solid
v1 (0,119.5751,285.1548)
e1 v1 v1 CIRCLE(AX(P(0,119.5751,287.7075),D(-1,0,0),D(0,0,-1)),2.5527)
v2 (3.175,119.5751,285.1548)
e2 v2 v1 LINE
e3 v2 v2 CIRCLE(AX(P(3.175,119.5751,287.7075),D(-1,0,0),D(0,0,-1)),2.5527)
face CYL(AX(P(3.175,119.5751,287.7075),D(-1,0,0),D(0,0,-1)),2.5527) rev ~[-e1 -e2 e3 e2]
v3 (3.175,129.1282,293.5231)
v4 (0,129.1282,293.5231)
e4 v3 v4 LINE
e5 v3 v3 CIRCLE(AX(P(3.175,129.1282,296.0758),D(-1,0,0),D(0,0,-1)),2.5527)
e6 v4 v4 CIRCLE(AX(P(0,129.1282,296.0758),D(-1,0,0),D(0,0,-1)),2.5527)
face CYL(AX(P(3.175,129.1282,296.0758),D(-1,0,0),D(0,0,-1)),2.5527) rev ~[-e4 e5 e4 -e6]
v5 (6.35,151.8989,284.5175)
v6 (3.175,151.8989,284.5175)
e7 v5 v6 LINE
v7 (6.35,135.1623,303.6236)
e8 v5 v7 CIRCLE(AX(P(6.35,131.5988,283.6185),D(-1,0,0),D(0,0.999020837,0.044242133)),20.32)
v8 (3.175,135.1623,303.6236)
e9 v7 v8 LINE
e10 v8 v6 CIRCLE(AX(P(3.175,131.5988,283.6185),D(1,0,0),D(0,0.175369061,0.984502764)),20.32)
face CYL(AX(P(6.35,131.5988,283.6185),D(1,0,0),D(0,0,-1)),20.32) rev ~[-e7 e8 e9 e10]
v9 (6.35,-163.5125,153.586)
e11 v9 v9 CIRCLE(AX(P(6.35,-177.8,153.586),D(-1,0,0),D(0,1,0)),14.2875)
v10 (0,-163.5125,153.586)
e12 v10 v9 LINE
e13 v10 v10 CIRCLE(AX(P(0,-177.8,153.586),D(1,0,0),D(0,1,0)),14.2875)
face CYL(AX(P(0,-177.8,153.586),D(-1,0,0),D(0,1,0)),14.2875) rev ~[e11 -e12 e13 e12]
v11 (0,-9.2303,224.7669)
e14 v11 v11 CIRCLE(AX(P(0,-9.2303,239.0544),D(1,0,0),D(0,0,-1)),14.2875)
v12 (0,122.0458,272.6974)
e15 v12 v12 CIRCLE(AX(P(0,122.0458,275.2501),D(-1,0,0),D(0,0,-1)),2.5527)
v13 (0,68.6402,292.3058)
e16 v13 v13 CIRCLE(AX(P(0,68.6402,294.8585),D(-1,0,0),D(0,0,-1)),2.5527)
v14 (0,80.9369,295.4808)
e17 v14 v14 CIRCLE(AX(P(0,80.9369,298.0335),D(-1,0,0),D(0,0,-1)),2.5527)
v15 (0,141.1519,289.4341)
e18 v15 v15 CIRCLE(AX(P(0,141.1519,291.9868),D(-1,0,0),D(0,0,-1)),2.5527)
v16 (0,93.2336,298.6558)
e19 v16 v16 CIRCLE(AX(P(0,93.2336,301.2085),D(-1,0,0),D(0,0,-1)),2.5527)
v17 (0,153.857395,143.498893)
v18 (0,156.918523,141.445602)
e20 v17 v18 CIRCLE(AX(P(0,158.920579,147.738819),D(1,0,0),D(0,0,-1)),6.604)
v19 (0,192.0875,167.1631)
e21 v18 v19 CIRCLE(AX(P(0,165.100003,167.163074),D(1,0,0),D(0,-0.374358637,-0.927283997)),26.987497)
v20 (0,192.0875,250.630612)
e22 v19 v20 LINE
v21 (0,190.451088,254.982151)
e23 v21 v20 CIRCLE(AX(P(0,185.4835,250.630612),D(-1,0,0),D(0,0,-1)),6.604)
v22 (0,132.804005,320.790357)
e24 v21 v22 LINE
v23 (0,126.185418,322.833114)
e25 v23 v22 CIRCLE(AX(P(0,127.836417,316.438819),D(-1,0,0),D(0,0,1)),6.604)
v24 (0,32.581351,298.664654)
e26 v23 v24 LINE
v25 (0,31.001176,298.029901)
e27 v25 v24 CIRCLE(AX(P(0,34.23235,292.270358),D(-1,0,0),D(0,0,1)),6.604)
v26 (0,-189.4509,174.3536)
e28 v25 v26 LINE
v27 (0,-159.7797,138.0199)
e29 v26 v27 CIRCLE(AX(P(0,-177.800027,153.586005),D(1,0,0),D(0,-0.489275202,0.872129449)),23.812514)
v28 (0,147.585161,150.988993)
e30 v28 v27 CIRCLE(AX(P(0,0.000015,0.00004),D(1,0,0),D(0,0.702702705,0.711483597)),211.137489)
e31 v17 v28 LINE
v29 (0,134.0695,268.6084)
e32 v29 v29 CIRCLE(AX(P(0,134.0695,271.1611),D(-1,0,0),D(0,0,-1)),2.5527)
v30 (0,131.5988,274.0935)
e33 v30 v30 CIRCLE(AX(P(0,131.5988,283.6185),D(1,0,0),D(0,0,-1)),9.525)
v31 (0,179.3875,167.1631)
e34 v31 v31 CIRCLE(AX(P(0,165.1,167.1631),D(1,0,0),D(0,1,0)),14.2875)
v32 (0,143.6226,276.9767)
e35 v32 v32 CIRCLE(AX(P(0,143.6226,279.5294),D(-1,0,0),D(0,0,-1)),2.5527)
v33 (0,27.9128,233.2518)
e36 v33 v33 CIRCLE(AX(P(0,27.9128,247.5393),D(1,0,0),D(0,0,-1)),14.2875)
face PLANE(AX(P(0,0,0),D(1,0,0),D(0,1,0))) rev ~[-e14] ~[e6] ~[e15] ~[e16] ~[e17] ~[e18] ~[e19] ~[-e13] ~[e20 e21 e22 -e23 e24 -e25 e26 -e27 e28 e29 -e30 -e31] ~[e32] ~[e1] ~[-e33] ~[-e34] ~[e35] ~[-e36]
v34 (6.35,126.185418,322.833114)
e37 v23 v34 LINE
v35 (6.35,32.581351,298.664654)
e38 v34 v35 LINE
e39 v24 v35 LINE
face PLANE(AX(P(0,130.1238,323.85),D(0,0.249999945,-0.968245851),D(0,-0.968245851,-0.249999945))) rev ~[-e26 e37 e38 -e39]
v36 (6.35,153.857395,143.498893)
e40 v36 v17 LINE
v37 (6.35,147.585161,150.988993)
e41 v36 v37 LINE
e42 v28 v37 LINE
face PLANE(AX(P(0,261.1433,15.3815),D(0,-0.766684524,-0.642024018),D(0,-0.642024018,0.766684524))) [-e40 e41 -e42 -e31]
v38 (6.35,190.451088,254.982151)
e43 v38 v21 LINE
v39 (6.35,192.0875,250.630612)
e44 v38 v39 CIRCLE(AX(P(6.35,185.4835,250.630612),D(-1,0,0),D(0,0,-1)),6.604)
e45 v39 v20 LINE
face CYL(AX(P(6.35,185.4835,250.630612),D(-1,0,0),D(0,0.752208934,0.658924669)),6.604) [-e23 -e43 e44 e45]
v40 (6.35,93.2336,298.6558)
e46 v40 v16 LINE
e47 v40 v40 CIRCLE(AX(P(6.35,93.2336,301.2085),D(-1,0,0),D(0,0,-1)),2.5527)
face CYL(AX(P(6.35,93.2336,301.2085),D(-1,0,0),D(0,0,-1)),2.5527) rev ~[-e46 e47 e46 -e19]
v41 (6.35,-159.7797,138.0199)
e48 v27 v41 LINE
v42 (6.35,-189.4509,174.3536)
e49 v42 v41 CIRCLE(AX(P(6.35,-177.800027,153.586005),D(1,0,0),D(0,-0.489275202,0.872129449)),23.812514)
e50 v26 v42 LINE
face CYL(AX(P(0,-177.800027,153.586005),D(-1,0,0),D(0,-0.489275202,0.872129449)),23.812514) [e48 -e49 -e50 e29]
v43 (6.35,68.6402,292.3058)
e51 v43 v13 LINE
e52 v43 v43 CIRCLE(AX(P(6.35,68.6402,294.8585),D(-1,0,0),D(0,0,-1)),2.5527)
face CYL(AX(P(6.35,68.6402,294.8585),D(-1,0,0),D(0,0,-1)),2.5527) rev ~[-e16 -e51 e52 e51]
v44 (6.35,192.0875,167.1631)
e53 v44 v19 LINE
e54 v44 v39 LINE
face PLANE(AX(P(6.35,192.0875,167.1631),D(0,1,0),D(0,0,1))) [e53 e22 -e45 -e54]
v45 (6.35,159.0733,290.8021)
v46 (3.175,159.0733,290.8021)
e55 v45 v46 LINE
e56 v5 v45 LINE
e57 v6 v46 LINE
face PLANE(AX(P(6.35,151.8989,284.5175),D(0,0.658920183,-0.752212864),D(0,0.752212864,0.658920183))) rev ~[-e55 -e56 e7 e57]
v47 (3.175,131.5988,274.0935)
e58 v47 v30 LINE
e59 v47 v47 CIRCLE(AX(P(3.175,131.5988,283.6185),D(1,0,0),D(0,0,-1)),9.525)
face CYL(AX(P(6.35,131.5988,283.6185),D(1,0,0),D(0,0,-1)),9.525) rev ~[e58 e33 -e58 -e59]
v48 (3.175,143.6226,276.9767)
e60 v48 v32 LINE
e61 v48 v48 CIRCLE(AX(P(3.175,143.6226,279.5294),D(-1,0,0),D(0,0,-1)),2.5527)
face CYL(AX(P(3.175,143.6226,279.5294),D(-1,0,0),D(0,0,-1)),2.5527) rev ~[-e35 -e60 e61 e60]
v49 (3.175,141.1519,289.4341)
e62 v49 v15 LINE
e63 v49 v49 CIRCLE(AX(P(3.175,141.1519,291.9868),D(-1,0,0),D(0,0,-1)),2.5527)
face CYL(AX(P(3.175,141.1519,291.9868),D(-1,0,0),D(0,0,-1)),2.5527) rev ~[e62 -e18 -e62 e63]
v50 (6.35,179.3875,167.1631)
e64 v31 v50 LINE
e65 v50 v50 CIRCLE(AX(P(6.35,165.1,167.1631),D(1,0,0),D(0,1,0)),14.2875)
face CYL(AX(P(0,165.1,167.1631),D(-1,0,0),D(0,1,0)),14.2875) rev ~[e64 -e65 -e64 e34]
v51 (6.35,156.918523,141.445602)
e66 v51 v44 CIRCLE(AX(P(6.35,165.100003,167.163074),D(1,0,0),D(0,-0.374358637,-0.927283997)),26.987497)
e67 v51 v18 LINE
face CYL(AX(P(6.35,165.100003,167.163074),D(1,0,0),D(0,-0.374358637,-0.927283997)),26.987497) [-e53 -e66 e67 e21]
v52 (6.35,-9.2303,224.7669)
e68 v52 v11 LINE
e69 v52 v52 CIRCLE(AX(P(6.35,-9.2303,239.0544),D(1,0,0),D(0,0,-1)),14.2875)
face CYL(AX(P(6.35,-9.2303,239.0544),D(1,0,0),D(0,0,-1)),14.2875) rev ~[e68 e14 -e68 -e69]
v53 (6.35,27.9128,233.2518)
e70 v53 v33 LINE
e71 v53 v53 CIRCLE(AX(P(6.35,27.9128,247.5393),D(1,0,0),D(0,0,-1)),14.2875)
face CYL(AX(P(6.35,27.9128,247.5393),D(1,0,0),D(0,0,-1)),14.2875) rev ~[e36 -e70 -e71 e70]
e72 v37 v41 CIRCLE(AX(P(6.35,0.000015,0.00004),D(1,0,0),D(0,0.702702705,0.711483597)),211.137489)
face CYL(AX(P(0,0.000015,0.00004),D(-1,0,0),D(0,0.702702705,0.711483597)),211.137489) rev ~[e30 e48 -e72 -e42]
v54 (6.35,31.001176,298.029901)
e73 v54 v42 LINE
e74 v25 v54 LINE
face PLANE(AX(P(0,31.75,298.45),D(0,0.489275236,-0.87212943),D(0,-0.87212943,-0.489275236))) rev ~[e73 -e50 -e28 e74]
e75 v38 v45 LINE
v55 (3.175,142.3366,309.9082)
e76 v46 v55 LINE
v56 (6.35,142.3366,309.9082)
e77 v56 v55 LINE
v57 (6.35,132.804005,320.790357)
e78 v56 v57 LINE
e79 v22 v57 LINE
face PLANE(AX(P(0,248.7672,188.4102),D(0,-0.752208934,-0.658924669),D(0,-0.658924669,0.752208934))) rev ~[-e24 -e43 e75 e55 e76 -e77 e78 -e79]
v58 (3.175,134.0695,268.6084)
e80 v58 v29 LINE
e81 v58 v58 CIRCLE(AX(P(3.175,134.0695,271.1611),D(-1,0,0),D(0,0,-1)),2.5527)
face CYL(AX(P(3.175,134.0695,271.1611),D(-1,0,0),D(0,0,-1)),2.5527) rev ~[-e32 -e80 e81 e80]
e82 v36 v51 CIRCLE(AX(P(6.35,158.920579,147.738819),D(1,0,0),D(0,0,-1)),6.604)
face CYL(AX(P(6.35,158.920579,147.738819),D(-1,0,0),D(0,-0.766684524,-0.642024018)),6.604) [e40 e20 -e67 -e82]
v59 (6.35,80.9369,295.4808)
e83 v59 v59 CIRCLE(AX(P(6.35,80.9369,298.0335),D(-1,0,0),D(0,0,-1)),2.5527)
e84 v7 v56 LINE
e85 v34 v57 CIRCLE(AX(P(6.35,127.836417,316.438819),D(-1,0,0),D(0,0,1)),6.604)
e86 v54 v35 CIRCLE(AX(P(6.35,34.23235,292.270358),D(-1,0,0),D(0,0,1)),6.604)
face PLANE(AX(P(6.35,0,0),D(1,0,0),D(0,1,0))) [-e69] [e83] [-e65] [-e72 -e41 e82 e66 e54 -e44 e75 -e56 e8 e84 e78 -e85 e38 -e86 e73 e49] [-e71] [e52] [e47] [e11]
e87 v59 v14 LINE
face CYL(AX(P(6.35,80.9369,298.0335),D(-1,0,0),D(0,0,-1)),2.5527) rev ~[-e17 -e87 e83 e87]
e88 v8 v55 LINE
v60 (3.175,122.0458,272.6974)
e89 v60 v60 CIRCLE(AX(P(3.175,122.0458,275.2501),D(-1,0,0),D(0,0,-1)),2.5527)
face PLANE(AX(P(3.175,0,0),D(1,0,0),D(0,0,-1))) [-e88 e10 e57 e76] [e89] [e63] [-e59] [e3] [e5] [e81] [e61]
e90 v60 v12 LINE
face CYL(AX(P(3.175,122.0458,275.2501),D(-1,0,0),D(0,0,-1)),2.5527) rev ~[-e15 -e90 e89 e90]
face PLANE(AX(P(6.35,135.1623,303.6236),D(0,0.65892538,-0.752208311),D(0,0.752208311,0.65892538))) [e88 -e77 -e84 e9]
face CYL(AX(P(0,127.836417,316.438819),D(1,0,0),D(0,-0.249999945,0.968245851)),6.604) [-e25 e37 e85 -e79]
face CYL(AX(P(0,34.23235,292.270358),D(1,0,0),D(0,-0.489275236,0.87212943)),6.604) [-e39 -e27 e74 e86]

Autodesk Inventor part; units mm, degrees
ref_plane "YZ Plane" through (0, 0, 0) normal (1, 0, 0) x (0, 1, 0)
ref_plane "XZ Plane" through (0, 0, 0) normal (0, 1, 0) x (-1, 0, 0)
ref_plane "XY Plane" through (0, 0, 0) normal (0, 0, 1) x (1, 0, 0)
sketch "Sketch1" plane through (0, 0, 0) normal (1, 0, 0) x (0, 1, 0)
  circle A0 centre (0, 0) radius 203.2 construction
  circle A1 centre (165.1, 167.1631) radius 38.1 construction
  circle A2 centre (165.1, 167.1631) radius 31.75 construction
  circle A3 centre (-177.8, 153.586) radius 38.1 construction
  circle A4 centre (-177.8, 153.586) radius 31.75 construction
  circle A5 centre (279.4, 30.6697) radius 38.1 construction
  circle A6 centre (279.4, 30.6697) radius 31.75 construction
  line L0 (371.6722, 159.6086) -> (293.9242, 243.3925) construction
  line L1 (293.9242, 243.3925) -> (72.8278, 38.2242) construction
  line L2 (72.8278, 38.2242) -> (150.5758, -45.5597) construction
  line L3 (150.5758, -45.5597) -> (371.6722, 159.6086) construction
  line L4 (371.6722, 159.6086) -> (72.8278, 38.2242) construction
  line L5 (293.9242, 243.3925) -> (150.5758, -45.5597) construction
  line L6 (165.1, 167.1631) -> (279.4, 30.6697) construction
  point P0 (222.25, 98.9164)
  dimension "d0" = 406.4
  dimension "d1" = 76.2
  dimension "d2" = 6.35
  dimension "d4" = 114.3
  dimension "d5" = 301.625
  dimension "d6" = 177.8
  dimension "d51" = 165.1
  dimension "d52" = 279.4
  dimension "d53" = 30.6697
sketch "Sketch4" plane through (0, 0, 0) normal (1, 0, 0) x (0, 1, 0)
  circle A0 centre (0, 0) radius 203.2 construction
  circle A1 centre (165.1, 167.1631) radius 38.1 construction
  circle A2 centre (165.1, 167.1631) radius 31.75 construction
  circle A3 centre (-177.8, 153.586) radius 38.1 construction
  circle A4 centre (-177.8, 153.586) radius 31.75 construction
  circle A5 centre (279.4, 30.6697) radius 38.1 construction
  circle A6 centre (279.4, 30.6697) radius 31.75 construction
  line L0 (371.6722, 159.6086) -> (293.9242, 243.3925) construction
  line L1 (293.9242, 243.3925) -> (72.8278, 38.2242) construction
  line L2 (72.8278, 38.2242) -> (150.5758, -45.5597) construction
  line L3 (150.5758, -45.5597) -> (371.6722, 159.6086) construction
  line L4 (371.6722, 159.6086) -> (72.8278, 38.2242) construction
  line L5 (293.9242, 243.3925) -> (150.5758, -45.5597) construction
  line L6 (165.1, 167.1631) -> (279.4, 30.6697) construction
  circle A7 centre (-177.8, 153.586) radius 14.2875
  circle A8 centre (165.1, 167.1631) radius 14.2875
  circle A9 centre (279.4, 30.6697) radius 14.2875
  circle A10 centre (165.1, 167.1631) radius 23.8125 construction
  circle A11 centre (279.4, 30.6697) radius 23.8125 construction
  circle A12 centre (-177.8, 153.586) radius 23.8125 construction
  line L7 (261.1433, 15.3815) -> (146.8433, 151.8749)
  line L8 (309.92, 115.3835) -> (248.7672, 188.4102)
  line L9 (309.92, 115.3835) -> (303.1398, 28.8105)
  line L10 (248.7672, 188.4102) -> (130.1238, 323.85)
  line L11 (130.1238, 323.85) -> (31.75, 298.45)
  line L12 (31.75, 298.45) -> (-189.4509, 174.3536)
  arc A13 (148.3669, 150.2209) -> (-159.7797, 138.0199) centre (0, 0) ccw
  arc A14 (148.3669, 150.2209) -> (146.8433, 151.8749) centre (165.1, 167.1631) ccw
  arc A15 (256.4562, 24.2964) -> (303.1398, 28.8105) centre (279.4, 30.6697) ccw
  line L13 (332.7982, 201.5005) -> (111.7018, -3.6678) construction
  arc A16 (-189.4509, 174.3536) -> (-159.7797, 138.0199) centre (-177.8, 153.586) ccw
  point P0 (222.25, 98.9164)
  point P1 (279.3436, 151.8969)
  point P2 (261.1433, 15.3815)
  point P3 (147.5854, 150.9888)
  dimension "d27" = 28.575
  dimension "d29" = 9.525
  dimension "d31" = 101.6
  dimension "d33" = 101.6
  dimension "d35" = 95.25
  dimension "d58" = 298.45
  dimension "d59" = 323.85
  dimension "d60" = 31.75
extrude "Extrusion2" add sketch "Sketch4" along normal blind 6.35 contours L7 A14 A13 | L7 A13 A16 L12 L11 L10 L8 L9 A15
sketch "Sketch5" plane through (6.35, 0, 0) normal (1, 0, 0) x (0, 0, -1)
  line L0 (-323.85, 130.1238) -> (-298.45, 31.75) projected
  line L1 (-301.2085, 93.2336) -> (-294.8585, 68.6402) construction
  point P0 (0, 0)
  point P1 (-298.0335, 80.9369)
  point P2 (-311.15, 80.9369)
  point P3 (-298.0335, 80.9369)
  point P4 (-311.15, 80.9369)
  dimension "d39" = 12.7
  dimension "d57" = 25.4
hole "Hole2" at (6.35, 93.2336, 301.2085) at (6.35, 80.9369, 298.0335) at (6.35, 68.6402, 294.8585) direction (-1, 0, 0) diameter 5.1054 end through all clearance for "Flat Head Machine Screw (82)" size "#10" standard "Ansi Unified Screw Threads"
sketch "Sketch6" plane through (6.35, 0, 0) normal (1, 0, 0) x (0, 0, -1)
  circle A0 centre (-298.0335, 80.9369) radius 2.5527 projected
  circle A1 centre (-301.2085, 93.2336) radius 2.5527 projected
  circle A2 centre (-294.8585, 68.6402) radius 2.5527 projected
  arc A3 (-15.3815, 261.1433) -> (-28.8105, 303.1398) centre (-30.6697, 279.4) ccw projected
  line L0 (-28.8105, 303.1398) -> (-115.3835, 309.92) projected
  line L1 (-115.3835, 309.92) -> (-188.4102, 248.7672) projected
  line L2 (-188.4102, 248.7672) -> (-323.85, 130.1238) projected
  line L3 (-323.85, 130.1238) -> (-298.45, 31.75) projected
  line L4 (-298.45, 31.75) -> (-174.3536, -189.4509) projected
  arc A4 (-174.3536, -189.4509) -> (-138.0199, -159.7797) centre (-153.586, -177.8) ccw projected
  arc A5 (-150.9888, 147.5854) -> (-138.0199, -159.7797) centre (0, 0) ccw projected
  line L5 (-150.9888, 147.5854) -> (-15.3815, 261.1433) projected
  circle A6 centre (-30.6697, 279.4) radius 14.2875 projected
  circle A7 centre (-167.1631, 165.1) radius 14.2875 projected
  circle A8 centre (-153.586, -177.8) radius 14.2875 projected
  circle A9 centre (-167.1631, 165.1) radius 26.9875 construction
  line L6 (-167.1631, 192.0875) -> (-253.1141, 192.0875)
  line L7 (-188.4102, 248.7672) -> (-323.85, 130.1238) construction
  circle A10 centre (-167.1631, 165.1) radius 14.2875 construction
  line L8 (-150.9888, 147.5854) -> (-15.3815, 261.1433) construction
  arc A11 (-142.138, 154.997) -> (-167.1631, 192.0875) centre (-167.1631, 165.1) ccw
  dimension "d65" = 12.7
extrude "Extrusion3" cut sketch "Sketch6" against normal blind 25.4 contours A0 | A1 | A2 | L5 A11 L6 L2 L1 L0 A3 | A8
fillet "Fillet1" radius 6.604 4 edges at (3.175, 192.0875, 253.1141) (3.175, 130.1238, 323.85) (3.175, 31.75, 298.45) (3.175, 154.997, 142.138)
sketch "Sketch8" plane through (6.35, 0, 0) normal (1, 0, 0) x (0, 0, -1)
  circle A0 centre (-283.6185, 131.5988) radius 7.6454 construction
  circle A1 centre (-283.6185, 131.5988) radius 19.05 construction
  circle A2 centre (-167.1631, 165.1) radius 28.6512 construction
  arc A3 (-320.7904, 132.804) -> (-322.8331, 126.1854) centre (-316.4388, 127.8364) ccw construction
  line L0 (-320.7904, 132.804) -> (-254.9821, 190.4511) construction
  arc A4 (-250.6306, 192.0875) -> (-254.9821, 190.4511) centre (-250.6306, 185.4835) ccw construction
  line L1 (-250.6306, 192.0875) -> (-167.1631, 192.0875) construction
  arc A5 (-141.4456, 156.9185) -> (-167.1631, 192.0875) centre (-167.1631, 165.1) ccw construction
  arc A6 (-143.4989, 153.8574) -> (-141.4456, 156.9185) centre (-147.7388, 158.9206) ccw construction
  line L2 (-143.4989, 153.8574) -> (-150.9888, 147.5854) construction
  arc A7 (-150.9888, 147.5854) -> (-138.0199, -159.7797) centre (0, 0) ccw construction
  arc A8 (-174.3536, -189.4509) -> (-138.0199, -159.7797) centre (-153.586, -177.8) ccw construction
  line L3 (-174.3536, -189.4509) -> (-298.0299, 31.0012) construction
  arc A9 (-298.6647, 32.5814) -> (-298.0299, 31.0012) centre (-292.2704, 34.2324) ccw construction
  line L4 (-298.6647, 32.5814) -> (-322.8331, 126.1854) construction
  circle A10 centre (-298.0335, 80.9369) radius 2.5527 construction
  circle A11 centre (-301.2085, 93.2336) radius 2.5527 construction
  circle A12 centre (-294.8585, 68.6402) radius 2.5527 construction
  circle A13 centre (-153.586, -177.8) radius 14.2875 construction
  circle A14 centre (-167.1631, 165.1) radius 14.2875 construction
  circle A15 centre (-283.6185, 131.5988) radius 9.525
  circle A16 centre (-167.1631, 165.1) radius 14.2875
  circle A17 centre (-247.5393, 27.9128) radius 14.2875
  circle A18 centre (-247.5393, 27.9128) radius 19.05 construction
  circle A19 centre (-239.0544, -9.2303) radius 19.05 construction
  circle A20 centre (-239.0544, -9.2303) radius 14.2875
  dimension "d76" = 15.2908
  dimension "d77" = 38.1
  dimension "d78" = 57.3024
  dimension "d79" = 121.1783
  dimension "d81" = 25.4
  dimension "d83" = 19.05
  dimension "d84" = 28.575
  dimension "d85" = 158.9989
  dimension "d87" = 38.1
  dimension "d88" = 188.9989
  dimension "d111" = 31.75
extrude "Extrusion4" cut sketch "Sketch8" against normal through all
sketch "Sketch9" plane through (6.35, 0, 0) normal (1, 0, 0) x (0, 0, -1)
  circle A0 centre (-247.5393, 27.9128) radius 14.2875 construction
  circle A1 centre (-283.6185, 131.5988) radius 9.525 construction
  circle A2 centre (-239.0544, -9.2303) radius 14.2875 construction
  circle A3 centre (-167.1631, 165.1) radius 14.2875 construction
  arc A4 (-320.7904, 132.804) -> (-322.8331, 126.1854) centre (-316.4388, 127.8364) ccw construction
  line L0 (-320.7904, 132.804) -> (-254.9821, 190.4511) construction
  arc A5 (-250.6306, 192.0875) -> (-254.9821, 190.4511) centre (-250.6306, 185.4835) ccw construction
  line L1 (-250.6306, 192.0875) -> (-167.1631, 192.0875) construction
  arc A6 (-141.4456, 156.9185) -> (-167.1631, 192.0875) centre (-167.1631, 165.1) ccw construction
  arc A7 (-143.4989, 153.8574) -> (-141.4456, 156.9185) centre (-147.7388, 158.9206) ccw construction
  line L2 (-143.4989, 153.8574) -> (-150.9888, 147.5854) construction
  arc A8 (-150.9888, 147.5854) -> (-138.0199, -159.7797) centre (0, 0) ccw construction
  arc A9 (-174.3536, -189.4509) -> (-138.0199, -159.7797) centre (-153.586, -177.8) ccw construction
  line L3 (-174.3536, -189.4509) -> (-298.0299, 31.0012) construction
  arc A10 (-298.6647, 32.5814) -> (-298.0299, 31.0012) centre (-292.2704, 34.2324) ccw construction
  line L4 (-298.6647, 32.5814) -> (-322.8331, 126.1854) construction
  circle A11 centre (-298.0335, 80.9369) radius 2.5527 construction
  circle A12 centre (-301.2085, 93.2336) radius 2.5527 construction
  circle A13 centre (-294.8585, 68.6402) radius 2.5527 construction
  circle A14 centre (-153.586, -177.8) radius 14.2875 construction
  circle A15 centre (-283.6185, 131.5988) radius 20.32
  line L5 (-284.5175, 151.8989) -> (-290.8021, 159.0733)
  line L6 (-303.6236, 135.1623) -> (-309.9082, 142.3366)
  line L7 (-254.9821, 190.4511) -> (-320.7904, 132.804) construction
  line L8 (-290.8021, 159.0733) -> (-309.9082, 142.3366) construction
  line L9 (-283.6185, 131.5988) -> (-300.3551, 150.7049) construction
  line L10 (-290.8021, 159.0733) -> (-309.9082, 142.3366)
  dimension "d93" = 40.64
  dimension "d96" = 25.4
extrude "Extrusion5" cut sketch "Sketch9" against normal blind 3.175
sketch "Sketch10" plane through (3.175, 0, 0) normal (1, 0, 0) x (0, 0, -1)
  circle A0 centre (-247.5393, 27.9128) radius 14.2875 construction
  circle A1 centre (-283.6185, 131.5988) radius 9.525 construction
  circle A2 centre (-239.0544, -9.2303) radius 14.2875 construction
  circle A3 centre (-167.1631, 165.1) radius 14.2875 construction
  arc A4 (-298.6647, 32.5814) -> (-298.0299, 31.0012) centre (-292.2704, 34.2324) ccw construction
  line L0 (-298.6647, 32.5814) -> (-322.8331, 126.1854) construction
  arc A5 (-320.7904, 132.804) -> (-322.8331, 126.1854) centre (-316.4388, 127.8364) ccw construction
  line L1 (-320.7904, 132.804) -> (-309.9082, 142.3366) construction
  line L2 (-309.9082, 142.3366) -> (-303.6236, 135.1623) construction
  arc A6 (-303.6236, 135.1623) -> (-284.5175, 151.8989) centre (-283.6185, 131.5988) ccw construction
  line L3 (-284.5175, 151.8989) -> (-290.8021, 159.0733) construction
  line L4 (-290.8021, 159.0733) -> (-254.9821, 190.4511) construction
  arc A7 (-250.6306, 192.0875) -> (-254.9821, 190.4511) centre (-250.6306, 185.4835) ccw construction
  line L5 (-250.6306, 192.0875) -> (-167.1631, 192.0875) construction
  arc A8 (-141.4456, 156.9185) -> (-167.1631, 192.0875) centre (-167.1631, 165.1) ccw construction
  arc A9 (-143.4989, 153.8574) -> (-141.4456, 156.9185) centre (-147.7388, 158.9206) ccw construction
  line L6 (-143.4989, 153.8574) -> (-150.9888, 147.5854) construction
  arc A10 (-150.9888, 147.5854) -> (-138.0199, -159.7797) centre (0, 0) ccw construction
  arc A11 (-174.3536, -189.4509) -> (-138.0199, -159.7797) centre (-153.586, -177.8) ccw construction
  line L7 (-174.3536, -189.4509) -> (-298.0299, 31.0012) construction
  line L8 (-309.9082, 142.3366) -> (-290.8021, 159.0733) construction
  circle A12 centre (-298.0335, 80.9369) radius 2.5527 construction
  circle A13 centre (-301.2085, 93.2336) radius 2.5527 construction
  circle A14 centre (-294.8585, 68.6402) radius 2.5527 construction
  circle A15 centre (-153.586, -177.8) radius 14.2875 construction
  circle A16 centre (-283.6185, 131.5988) radius 12.7 construction
  point P0 (-279.5294, 143.6226)
  point P1 (-291.9868, 141.1519)
  point P2 (-296.0758, 129.1282)
  point P3 (-287.7075, 119.5751)
  point P4 (-275.2501, 122.0458)
  point P5 (-271.1611, 134.0695)
  dimension "d97" = 25.4
  dimension "d100" = 360
  dimension "d110" = 19.05
hole "Hole4" at (3.175, 143.6226, 279.5294) at (3.175, 141.1519, 291.9868) at (3.175, 129.1282, 296.0758) at (3.175, 119.5751, 287.7075) at (3.175, 122.0458, 275.2501) at (3.175, 134.0695, 271.1611) direction (-1, 0, 0) diameter 5.1054 end through all clearance for "Flat Head Machine Screw (82)" size "#10" standard "Ansi Unified Screw Threads"
properties part number "GP4-001" material "Polycarbonate, Smoke"
